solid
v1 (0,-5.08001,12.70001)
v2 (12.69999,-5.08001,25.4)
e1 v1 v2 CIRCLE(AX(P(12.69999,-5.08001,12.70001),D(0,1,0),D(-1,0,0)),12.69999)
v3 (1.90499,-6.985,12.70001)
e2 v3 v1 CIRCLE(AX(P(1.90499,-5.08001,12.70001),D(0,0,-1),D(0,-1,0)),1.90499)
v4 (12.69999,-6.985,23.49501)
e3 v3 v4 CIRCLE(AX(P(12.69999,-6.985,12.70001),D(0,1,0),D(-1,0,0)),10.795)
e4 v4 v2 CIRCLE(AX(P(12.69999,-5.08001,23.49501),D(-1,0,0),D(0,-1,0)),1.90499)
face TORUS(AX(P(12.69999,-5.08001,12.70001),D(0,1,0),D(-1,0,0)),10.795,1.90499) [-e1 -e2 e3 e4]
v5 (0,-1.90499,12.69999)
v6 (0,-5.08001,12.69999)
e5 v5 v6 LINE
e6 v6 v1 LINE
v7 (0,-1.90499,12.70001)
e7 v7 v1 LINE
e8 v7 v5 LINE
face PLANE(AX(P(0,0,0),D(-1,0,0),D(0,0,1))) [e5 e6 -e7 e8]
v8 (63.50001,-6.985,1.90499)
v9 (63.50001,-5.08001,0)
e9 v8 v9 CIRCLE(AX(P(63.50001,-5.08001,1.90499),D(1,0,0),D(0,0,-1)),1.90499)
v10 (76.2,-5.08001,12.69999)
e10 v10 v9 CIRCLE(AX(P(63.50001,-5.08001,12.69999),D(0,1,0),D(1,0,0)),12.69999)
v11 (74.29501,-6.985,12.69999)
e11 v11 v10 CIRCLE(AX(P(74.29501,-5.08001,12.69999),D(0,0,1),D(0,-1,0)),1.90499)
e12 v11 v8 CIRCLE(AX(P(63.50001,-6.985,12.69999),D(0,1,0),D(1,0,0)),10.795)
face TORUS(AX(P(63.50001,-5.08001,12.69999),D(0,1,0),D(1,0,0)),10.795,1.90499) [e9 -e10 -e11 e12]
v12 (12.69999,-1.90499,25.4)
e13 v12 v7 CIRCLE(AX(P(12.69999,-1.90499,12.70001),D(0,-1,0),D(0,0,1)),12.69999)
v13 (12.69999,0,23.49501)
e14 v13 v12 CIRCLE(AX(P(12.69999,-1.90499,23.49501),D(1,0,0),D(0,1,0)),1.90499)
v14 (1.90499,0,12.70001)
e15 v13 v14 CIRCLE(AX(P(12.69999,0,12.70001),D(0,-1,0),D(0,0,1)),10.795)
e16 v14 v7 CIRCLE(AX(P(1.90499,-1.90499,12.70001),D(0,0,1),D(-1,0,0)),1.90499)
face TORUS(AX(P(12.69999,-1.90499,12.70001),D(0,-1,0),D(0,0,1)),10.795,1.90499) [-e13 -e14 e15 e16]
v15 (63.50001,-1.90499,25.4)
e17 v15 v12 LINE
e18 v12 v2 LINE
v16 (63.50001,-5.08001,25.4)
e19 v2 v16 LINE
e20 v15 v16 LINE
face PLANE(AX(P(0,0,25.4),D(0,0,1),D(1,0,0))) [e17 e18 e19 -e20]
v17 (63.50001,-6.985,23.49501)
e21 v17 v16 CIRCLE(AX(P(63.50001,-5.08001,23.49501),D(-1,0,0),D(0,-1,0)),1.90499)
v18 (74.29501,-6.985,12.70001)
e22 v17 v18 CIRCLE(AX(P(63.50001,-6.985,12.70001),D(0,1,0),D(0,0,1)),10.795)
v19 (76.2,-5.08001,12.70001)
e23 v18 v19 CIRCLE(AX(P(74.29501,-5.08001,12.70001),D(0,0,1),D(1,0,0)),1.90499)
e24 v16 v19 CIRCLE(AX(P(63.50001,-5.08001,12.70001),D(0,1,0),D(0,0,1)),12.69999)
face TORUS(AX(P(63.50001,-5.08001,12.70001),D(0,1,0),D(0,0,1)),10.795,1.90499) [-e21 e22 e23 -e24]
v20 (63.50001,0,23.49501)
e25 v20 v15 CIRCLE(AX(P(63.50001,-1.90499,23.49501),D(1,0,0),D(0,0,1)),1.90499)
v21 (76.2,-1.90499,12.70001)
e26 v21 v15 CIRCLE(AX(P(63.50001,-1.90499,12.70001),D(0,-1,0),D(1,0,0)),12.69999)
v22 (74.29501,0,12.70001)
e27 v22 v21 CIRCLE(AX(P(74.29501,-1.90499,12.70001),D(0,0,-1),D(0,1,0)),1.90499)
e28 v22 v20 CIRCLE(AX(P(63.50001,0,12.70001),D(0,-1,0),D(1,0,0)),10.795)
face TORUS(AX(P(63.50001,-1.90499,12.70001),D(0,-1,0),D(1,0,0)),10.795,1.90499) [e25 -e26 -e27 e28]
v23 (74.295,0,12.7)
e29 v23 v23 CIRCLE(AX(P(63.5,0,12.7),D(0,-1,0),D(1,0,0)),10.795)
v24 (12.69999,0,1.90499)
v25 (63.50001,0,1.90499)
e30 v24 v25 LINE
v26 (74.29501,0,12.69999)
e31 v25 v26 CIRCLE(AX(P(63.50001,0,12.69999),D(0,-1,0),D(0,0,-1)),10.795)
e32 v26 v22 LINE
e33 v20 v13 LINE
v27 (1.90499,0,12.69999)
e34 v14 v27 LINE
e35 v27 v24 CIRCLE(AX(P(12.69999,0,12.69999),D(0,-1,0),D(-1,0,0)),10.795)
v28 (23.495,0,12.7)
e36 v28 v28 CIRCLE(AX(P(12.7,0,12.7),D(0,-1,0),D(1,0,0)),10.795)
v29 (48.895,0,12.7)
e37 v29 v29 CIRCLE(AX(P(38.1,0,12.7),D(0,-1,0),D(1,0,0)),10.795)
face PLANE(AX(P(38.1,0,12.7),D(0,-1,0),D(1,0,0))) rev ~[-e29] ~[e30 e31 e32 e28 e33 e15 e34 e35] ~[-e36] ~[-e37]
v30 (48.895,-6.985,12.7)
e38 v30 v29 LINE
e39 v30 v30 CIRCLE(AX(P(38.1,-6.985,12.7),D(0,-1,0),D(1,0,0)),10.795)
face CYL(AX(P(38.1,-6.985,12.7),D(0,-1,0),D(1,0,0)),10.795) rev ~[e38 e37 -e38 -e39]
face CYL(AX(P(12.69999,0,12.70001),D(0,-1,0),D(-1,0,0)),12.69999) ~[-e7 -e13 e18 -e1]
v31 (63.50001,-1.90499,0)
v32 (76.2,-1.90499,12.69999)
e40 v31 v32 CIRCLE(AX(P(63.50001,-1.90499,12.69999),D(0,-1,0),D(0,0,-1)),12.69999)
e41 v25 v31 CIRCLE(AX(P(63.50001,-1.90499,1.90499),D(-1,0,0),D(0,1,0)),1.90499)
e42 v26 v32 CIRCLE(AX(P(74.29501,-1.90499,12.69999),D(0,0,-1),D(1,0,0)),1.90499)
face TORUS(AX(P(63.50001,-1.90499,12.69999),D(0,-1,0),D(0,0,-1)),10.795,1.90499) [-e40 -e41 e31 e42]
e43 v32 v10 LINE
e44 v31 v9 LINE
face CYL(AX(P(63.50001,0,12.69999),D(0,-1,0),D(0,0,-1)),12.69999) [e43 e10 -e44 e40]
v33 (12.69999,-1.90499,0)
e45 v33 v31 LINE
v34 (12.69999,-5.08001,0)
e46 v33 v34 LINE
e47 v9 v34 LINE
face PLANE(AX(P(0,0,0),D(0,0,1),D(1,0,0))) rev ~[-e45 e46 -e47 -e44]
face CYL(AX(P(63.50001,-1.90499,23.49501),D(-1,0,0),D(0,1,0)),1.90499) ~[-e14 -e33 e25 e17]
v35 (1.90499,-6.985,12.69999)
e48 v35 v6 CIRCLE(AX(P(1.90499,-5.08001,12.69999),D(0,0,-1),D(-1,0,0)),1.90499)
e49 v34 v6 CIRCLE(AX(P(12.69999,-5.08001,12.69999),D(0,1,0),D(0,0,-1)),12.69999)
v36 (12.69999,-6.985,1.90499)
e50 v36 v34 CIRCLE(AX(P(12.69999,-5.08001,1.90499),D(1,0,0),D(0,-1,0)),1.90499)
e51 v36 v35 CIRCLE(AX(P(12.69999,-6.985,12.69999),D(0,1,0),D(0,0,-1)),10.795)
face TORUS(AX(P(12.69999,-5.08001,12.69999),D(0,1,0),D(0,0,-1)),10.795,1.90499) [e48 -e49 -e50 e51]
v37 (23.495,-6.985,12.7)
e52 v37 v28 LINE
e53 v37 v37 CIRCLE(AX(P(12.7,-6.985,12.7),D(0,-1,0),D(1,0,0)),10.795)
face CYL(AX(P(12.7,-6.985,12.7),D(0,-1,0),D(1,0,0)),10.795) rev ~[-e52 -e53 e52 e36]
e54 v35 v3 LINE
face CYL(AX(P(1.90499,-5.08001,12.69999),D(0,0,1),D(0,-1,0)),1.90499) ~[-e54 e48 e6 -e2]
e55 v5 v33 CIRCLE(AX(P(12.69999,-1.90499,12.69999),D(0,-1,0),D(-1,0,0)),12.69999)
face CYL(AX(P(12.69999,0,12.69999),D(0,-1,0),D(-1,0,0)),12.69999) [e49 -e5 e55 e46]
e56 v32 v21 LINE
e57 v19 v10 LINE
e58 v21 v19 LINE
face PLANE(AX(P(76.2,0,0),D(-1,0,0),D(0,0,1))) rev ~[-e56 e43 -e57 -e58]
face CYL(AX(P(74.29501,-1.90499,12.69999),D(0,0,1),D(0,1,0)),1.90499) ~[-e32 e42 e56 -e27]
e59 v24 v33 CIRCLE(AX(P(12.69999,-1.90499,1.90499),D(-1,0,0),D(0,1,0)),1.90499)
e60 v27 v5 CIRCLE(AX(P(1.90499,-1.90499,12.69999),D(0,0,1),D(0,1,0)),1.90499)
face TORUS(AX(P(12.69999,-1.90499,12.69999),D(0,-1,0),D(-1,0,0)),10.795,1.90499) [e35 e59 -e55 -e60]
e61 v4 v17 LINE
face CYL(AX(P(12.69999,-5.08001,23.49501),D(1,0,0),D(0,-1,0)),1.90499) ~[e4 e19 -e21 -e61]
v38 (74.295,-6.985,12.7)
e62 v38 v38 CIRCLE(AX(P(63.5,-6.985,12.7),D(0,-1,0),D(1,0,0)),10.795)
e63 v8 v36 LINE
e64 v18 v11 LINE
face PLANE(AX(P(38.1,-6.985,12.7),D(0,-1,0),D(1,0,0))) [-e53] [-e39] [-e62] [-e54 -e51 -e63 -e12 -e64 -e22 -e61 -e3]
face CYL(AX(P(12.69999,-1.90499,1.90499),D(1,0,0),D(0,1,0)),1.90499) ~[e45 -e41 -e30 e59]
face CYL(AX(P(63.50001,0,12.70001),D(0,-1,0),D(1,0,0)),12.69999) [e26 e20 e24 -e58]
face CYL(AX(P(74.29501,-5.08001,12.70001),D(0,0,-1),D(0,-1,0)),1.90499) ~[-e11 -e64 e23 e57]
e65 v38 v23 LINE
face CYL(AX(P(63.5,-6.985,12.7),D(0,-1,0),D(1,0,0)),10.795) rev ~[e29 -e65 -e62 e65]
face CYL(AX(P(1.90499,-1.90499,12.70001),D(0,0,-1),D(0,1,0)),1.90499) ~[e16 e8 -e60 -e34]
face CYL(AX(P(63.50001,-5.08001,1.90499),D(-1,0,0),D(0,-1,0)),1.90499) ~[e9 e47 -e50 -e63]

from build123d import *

# Parameters (mm, degrees)
F0_W     = 76.2
F0_H     = 25.4
F1_DEPTH = 6.985
F2_R     = 12.69999
F3_R     = 10.795
F4_DEPTH = 6.986
F5_R     = 1.90499


# Not quite as in the source:
# - a fillet or chamfer is up to 0.001 mm smaller than in the source, because OpenCascade refuses the exact size


with BuildPart() as f1:
    # F0 (on Front) → F1 (new body)
    with BuildSketch(Plane.XZ):
        with Locations((38.1, 12.7)):
            Rectangle(F0_W, F0_H)
    extrude(amount=F1_DEPTH)

    # F2 (radius 12.7 in the source; OpenCascade refuses exactly that, so slightly less here)
    f2_edges = [f1.edges().sort_by_distance(p)[0] for p in [
        (76.2, -3.4925, 25.4),
        (0, -3.4925, 25.4),
        (76.2, -3.4925, 0),
        (0, -3.4925, 0),
    ]]
    fillet(f2_edges, radius=F2_R)

    # F3 (on face) → F4 (cut, through all)
    with BuildSketch(Plane.XZ.offset(6.985)):
        with Locations((12.7, 12.7)):
            Circle(F3_R)
        with Locations((38.1, 12.7)):
            Circle(F3_R)
        with Locations((63.5, 12.7)):
            Circle(F3_R)
    extrude(amount=-F4_DEPTH, mode=Mode.SUBTRACT)

    # F5 (radius 1.905 in the source; OpenCascade refuses exactly that, so slightly less here)
    f5_edges = [f1.edges().sort_by_distance(p)[0] for p in [
        (38.1, -6.985, 25.4),
        (38.1, 0, 0),
    ]]
    fillet(f5_edges, radius=F5_R)


solid = f1.part
